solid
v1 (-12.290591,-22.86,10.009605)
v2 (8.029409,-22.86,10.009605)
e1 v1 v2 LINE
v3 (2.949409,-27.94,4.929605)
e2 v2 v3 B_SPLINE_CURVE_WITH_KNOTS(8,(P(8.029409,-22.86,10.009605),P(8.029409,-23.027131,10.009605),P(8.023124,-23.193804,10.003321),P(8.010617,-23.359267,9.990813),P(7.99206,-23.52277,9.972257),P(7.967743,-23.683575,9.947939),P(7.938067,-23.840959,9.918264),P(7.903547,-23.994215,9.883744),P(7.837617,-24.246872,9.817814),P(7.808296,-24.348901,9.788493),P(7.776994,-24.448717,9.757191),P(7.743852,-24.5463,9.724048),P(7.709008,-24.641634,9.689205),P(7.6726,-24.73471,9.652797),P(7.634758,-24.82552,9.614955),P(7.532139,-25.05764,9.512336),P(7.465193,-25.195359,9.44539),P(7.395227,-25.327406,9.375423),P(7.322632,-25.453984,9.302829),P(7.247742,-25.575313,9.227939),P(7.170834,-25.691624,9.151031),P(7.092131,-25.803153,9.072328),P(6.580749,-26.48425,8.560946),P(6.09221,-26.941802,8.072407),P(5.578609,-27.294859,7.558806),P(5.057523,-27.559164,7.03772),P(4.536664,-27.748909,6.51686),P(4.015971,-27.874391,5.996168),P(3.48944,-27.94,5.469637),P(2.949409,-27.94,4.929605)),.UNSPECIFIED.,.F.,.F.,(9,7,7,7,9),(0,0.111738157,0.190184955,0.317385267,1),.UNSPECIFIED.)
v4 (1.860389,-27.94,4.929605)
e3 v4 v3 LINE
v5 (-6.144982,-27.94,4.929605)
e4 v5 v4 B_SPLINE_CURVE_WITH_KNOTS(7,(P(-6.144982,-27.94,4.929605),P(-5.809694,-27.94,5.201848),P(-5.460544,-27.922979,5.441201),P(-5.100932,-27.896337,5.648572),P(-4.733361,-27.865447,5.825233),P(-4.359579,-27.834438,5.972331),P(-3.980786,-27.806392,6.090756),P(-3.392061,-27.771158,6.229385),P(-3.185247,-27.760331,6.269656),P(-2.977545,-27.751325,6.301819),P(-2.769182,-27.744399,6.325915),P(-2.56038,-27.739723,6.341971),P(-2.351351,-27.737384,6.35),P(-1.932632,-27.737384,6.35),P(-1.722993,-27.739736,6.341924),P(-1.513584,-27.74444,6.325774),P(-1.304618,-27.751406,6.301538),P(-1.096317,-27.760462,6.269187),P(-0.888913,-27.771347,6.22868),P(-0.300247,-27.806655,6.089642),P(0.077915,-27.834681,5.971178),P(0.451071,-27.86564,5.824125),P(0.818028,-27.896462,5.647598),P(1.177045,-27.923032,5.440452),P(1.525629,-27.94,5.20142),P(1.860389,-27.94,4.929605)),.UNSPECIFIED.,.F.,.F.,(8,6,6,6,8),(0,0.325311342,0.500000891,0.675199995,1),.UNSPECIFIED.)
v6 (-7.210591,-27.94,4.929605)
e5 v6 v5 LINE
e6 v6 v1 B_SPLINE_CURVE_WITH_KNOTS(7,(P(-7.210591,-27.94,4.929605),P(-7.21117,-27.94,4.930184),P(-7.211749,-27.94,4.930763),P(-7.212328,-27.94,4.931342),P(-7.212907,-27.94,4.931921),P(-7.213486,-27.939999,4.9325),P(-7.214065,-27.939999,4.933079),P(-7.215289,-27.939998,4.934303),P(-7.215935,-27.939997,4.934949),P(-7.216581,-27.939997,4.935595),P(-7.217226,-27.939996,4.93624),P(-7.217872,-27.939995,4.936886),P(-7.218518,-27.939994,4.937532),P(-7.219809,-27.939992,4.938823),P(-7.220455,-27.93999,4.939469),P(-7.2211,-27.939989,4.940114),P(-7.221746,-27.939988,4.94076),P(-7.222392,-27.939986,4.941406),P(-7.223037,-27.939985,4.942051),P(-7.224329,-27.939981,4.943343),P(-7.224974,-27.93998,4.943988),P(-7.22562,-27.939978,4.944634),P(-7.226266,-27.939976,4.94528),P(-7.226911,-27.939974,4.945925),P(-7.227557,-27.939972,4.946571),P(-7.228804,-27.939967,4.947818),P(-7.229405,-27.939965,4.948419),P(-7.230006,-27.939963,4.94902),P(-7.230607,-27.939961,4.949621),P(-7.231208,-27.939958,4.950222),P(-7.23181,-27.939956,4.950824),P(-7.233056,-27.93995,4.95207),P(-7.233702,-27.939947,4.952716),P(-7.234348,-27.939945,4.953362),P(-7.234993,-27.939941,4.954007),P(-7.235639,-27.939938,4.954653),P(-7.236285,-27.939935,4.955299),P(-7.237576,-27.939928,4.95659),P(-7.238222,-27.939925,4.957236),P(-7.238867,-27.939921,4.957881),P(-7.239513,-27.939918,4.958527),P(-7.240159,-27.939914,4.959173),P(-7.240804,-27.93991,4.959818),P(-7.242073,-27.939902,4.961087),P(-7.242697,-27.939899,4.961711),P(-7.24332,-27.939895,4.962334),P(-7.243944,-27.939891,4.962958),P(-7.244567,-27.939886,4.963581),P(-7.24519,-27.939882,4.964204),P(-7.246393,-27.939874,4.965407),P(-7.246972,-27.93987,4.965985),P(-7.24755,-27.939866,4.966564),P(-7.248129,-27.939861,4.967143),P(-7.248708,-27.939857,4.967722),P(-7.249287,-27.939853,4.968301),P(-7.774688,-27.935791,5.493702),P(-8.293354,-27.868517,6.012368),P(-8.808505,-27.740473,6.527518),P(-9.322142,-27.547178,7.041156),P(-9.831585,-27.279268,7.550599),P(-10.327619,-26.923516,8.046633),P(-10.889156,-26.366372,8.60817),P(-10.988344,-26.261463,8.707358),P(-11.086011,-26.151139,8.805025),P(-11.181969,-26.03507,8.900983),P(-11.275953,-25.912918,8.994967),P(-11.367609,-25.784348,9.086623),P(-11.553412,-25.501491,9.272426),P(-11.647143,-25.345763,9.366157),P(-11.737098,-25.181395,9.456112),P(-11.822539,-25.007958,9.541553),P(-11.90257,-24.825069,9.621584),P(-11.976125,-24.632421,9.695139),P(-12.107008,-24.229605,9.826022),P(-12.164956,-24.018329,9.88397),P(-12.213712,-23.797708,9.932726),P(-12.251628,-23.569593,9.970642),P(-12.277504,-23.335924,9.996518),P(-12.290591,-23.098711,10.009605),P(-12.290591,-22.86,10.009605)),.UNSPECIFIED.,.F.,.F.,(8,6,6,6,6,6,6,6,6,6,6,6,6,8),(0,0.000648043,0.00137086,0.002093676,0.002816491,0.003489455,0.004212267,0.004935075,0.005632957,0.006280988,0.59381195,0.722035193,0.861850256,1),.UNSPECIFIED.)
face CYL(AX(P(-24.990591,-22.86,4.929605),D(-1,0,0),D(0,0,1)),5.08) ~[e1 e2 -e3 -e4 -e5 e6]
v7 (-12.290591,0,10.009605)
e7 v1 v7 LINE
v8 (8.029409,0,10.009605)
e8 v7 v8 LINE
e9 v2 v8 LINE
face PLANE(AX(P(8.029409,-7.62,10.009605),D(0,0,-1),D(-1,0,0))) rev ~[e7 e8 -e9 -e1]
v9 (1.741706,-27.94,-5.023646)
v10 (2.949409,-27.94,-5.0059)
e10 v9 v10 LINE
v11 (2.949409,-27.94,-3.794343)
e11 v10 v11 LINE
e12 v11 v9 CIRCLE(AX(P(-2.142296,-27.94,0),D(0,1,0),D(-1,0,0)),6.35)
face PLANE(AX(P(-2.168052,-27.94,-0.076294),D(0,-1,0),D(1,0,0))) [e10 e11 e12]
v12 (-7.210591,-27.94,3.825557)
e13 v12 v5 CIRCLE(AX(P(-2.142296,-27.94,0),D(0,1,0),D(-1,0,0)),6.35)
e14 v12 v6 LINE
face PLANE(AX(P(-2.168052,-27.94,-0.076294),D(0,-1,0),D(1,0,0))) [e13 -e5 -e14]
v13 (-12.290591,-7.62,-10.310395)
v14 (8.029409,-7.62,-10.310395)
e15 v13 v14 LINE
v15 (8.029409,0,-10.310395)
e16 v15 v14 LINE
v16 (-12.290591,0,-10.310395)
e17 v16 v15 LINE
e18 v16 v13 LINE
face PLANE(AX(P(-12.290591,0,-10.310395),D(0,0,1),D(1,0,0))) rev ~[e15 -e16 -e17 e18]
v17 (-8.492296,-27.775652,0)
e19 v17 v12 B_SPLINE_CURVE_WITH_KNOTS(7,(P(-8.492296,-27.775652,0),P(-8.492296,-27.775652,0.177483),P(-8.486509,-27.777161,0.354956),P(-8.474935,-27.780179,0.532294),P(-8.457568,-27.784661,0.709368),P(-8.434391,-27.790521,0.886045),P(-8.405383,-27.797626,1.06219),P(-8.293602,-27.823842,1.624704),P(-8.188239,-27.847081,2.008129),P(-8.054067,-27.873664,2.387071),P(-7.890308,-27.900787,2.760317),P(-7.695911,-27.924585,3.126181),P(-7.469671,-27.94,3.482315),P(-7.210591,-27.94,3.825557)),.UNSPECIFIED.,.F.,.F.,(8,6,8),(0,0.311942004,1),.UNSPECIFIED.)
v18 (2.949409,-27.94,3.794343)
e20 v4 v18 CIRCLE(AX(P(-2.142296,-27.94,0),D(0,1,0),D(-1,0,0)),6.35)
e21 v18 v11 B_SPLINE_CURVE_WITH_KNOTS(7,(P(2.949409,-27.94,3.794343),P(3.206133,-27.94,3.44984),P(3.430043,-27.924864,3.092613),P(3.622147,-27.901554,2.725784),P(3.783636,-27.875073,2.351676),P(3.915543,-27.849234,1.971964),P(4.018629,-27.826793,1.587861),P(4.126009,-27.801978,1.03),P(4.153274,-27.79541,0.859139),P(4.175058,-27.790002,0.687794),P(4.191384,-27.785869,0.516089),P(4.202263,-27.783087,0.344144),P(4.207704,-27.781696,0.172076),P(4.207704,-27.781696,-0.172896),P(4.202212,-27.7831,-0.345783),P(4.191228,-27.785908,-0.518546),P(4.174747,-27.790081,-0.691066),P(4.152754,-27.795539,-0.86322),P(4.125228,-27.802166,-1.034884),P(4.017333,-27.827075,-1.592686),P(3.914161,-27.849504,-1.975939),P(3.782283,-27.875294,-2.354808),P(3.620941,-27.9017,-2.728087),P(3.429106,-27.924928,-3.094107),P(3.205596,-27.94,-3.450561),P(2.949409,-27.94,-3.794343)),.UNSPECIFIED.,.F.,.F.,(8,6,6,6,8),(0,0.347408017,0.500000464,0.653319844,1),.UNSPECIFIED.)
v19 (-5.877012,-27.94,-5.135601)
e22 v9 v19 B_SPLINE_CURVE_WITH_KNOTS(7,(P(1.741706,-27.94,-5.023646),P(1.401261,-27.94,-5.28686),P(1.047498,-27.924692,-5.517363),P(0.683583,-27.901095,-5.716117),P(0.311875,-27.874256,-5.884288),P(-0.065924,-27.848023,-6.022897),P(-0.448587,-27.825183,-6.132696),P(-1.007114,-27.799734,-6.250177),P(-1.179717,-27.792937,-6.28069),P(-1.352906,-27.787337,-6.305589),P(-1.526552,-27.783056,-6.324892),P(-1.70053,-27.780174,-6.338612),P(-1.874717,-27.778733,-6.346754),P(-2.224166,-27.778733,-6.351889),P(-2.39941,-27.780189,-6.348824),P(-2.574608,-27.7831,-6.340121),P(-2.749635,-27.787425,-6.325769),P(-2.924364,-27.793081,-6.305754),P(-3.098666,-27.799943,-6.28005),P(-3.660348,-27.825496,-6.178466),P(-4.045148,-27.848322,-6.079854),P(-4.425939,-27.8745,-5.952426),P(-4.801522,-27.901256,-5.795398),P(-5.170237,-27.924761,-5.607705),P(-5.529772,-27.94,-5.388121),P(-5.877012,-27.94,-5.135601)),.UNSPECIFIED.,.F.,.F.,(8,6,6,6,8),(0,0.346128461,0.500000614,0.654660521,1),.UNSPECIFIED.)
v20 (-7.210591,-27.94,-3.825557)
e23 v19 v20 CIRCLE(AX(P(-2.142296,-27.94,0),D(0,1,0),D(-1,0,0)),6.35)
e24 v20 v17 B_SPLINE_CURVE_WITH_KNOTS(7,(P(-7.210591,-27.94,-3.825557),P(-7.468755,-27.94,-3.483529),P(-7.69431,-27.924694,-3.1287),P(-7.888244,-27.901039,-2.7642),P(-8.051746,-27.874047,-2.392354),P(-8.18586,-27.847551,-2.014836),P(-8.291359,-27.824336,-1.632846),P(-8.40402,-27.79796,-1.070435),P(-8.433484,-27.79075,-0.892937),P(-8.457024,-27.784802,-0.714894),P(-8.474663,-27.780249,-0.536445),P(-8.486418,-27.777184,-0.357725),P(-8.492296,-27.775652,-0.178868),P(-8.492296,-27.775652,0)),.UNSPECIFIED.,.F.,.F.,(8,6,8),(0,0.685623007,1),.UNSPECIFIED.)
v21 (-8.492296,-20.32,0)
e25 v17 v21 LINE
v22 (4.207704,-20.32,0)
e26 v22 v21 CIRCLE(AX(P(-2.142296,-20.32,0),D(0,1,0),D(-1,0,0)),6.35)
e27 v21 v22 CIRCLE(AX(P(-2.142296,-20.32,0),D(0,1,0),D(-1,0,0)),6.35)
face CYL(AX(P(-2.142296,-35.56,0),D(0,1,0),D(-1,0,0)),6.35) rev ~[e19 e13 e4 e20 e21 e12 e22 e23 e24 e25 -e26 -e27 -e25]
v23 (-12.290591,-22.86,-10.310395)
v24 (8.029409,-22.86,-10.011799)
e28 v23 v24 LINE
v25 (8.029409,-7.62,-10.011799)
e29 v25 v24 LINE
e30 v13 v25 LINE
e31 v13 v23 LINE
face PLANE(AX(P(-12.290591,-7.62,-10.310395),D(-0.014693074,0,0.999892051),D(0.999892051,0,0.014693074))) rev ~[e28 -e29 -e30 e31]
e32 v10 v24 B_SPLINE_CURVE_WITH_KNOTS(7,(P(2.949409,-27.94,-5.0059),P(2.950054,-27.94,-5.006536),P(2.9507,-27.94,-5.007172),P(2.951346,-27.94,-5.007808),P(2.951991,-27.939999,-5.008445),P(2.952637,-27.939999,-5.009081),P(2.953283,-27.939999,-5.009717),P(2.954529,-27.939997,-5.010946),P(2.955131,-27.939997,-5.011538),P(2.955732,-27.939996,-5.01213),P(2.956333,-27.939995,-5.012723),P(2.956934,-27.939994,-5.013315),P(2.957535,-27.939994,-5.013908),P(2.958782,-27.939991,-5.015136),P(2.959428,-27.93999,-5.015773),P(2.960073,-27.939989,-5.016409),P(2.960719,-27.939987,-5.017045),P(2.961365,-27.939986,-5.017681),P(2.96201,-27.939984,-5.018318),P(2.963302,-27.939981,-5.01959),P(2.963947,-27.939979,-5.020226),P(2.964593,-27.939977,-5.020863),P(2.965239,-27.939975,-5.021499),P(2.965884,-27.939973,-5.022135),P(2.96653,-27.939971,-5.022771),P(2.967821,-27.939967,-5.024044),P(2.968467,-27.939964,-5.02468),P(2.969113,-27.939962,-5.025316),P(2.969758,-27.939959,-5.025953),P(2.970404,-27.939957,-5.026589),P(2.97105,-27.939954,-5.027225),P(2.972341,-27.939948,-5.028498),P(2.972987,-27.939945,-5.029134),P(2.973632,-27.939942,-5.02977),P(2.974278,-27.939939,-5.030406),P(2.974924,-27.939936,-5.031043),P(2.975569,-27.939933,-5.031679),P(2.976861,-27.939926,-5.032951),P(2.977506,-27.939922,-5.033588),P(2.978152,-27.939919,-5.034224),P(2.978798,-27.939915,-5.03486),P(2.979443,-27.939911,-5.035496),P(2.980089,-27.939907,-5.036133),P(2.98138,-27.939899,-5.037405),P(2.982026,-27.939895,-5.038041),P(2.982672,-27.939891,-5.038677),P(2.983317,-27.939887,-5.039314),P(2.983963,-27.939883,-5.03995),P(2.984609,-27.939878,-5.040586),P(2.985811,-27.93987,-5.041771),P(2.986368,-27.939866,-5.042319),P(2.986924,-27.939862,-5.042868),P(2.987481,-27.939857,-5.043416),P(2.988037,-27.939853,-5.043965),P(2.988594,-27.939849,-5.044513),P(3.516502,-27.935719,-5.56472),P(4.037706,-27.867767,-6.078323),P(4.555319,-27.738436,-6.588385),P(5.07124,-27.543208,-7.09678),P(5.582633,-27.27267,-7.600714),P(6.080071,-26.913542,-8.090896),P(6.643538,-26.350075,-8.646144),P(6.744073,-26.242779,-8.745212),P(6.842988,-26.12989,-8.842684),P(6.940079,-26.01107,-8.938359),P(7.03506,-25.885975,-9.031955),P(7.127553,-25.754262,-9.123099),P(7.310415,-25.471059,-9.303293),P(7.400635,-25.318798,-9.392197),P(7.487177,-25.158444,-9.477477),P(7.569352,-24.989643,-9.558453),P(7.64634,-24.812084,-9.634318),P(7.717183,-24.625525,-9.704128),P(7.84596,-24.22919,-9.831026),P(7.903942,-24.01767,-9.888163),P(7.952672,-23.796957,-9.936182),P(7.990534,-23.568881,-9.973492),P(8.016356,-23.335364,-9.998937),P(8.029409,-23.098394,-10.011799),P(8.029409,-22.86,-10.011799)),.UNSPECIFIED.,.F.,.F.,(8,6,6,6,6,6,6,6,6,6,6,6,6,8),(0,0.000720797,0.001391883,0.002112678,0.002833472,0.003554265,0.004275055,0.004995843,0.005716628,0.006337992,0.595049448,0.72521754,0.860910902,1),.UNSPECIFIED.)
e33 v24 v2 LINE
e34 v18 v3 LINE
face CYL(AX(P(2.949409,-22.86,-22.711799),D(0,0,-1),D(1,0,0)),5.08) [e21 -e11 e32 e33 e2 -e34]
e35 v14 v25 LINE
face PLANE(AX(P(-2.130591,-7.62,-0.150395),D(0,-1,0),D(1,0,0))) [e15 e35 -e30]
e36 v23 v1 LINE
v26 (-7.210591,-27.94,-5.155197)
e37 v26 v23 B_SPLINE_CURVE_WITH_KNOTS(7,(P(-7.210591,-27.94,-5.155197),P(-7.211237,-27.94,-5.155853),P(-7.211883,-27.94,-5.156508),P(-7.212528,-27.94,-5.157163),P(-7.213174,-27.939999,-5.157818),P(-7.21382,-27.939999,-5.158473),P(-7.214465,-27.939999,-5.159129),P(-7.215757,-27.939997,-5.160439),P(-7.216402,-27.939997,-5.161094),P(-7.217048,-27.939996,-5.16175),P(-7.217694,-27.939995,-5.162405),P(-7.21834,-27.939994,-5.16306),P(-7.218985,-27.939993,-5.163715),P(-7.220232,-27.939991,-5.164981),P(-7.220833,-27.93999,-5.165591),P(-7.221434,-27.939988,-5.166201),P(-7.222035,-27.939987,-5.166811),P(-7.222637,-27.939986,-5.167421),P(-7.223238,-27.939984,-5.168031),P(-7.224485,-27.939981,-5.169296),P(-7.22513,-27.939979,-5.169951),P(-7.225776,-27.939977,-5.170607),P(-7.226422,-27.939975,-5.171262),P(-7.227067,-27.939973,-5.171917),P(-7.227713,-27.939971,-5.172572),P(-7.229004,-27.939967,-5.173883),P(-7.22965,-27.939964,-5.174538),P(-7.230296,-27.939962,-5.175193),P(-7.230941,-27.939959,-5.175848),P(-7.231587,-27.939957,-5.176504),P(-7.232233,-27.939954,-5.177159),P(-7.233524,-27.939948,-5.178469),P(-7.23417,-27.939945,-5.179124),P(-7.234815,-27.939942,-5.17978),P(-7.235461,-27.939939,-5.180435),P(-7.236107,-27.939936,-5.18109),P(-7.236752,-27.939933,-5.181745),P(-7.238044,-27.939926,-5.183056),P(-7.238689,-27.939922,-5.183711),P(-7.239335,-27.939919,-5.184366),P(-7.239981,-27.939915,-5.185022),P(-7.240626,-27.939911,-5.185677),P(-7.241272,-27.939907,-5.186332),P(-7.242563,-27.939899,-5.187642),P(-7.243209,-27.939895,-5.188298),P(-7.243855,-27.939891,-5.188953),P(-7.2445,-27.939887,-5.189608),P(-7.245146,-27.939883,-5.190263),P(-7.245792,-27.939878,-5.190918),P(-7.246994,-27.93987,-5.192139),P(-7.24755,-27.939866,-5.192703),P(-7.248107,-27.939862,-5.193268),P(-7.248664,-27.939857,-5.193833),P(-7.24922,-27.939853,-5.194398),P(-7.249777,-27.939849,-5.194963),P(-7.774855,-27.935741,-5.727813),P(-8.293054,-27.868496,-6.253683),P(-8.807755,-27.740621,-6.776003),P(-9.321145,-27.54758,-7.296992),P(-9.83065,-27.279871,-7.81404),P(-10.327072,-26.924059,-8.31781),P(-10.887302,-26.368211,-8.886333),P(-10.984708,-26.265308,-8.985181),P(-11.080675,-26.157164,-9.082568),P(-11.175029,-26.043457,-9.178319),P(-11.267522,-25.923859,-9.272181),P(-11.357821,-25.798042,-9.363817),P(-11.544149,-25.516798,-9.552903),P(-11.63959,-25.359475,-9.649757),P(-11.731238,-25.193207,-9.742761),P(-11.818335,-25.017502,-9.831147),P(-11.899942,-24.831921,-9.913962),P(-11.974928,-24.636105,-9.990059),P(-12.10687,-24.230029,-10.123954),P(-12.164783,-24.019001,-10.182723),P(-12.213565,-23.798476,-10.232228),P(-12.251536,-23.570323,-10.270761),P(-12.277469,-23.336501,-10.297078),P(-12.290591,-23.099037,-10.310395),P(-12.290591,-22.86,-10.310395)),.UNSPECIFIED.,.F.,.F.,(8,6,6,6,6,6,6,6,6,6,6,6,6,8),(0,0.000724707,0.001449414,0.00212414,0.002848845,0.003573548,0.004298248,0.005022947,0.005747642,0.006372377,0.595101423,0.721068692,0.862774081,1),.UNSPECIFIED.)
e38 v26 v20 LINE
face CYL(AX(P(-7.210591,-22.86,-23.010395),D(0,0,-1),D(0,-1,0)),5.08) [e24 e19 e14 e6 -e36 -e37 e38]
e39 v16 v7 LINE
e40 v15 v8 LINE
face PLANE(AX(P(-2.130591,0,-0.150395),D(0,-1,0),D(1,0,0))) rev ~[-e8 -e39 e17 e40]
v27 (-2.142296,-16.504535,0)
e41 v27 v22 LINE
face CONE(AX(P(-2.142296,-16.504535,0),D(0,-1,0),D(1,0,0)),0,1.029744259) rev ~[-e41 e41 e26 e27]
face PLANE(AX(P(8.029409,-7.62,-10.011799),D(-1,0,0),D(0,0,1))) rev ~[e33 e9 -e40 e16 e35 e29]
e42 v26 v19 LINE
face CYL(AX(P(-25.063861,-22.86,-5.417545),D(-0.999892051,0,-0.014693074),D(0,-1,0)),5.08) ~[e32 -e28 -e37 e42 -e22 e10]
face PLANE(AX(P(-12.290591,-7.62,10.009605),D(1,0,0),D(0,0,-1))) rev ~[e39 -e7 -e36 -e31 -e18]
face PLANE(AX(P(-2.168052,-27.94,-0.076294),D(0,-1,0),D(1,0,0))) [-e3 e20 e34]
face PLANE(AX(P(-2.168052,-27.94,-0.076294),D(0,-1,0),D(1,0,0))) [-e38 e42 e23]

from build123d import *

# Parameters (mm, degrees)
F0_W        = 20.32
F0_H        = 20.32
F1_DEPTH    = 7.62
F3_DEPTH    = 20.32
F5_D        = 12.7
F5_DEPTH    = 7.62
F5_TIP      = 3.8154649308
F6_T1_DEPTH = 45.72
F6_T3_DEPTH = 45.4214045093
F6_T5_DEPTH = 45.72
F6_T7_DEPTH = 45.7221937612


# Not quite as in the source:
# - a fillet or chamfer that OpenCascade refuses, or shapes differently, is made with other operations: its cross-section is extruded or revolved along the edge and cut away or added


with BuildPart() as f1:
    # F0 (on Front) → F1 (new body)
    with BuildSketch(Plane.XZ):
        with Locations((-2.1305914207, -0.150394626)):
            Rectangle(F0_W, F0_H)
    extrude(amount=F1_DEPTH)

    # F2 (on face) → F3 (join)
    with BuildSketch(Plane.XZ.offset(7.62)):
        Polygon((-12.2905914207, 10.009605374), (-12.2905914207, -10.310394626), (8.0294085793, -10.0117991352), (8.0294085793, 10.009605374), align=None)
    extrude(amount=F3_DEPTH)

    # F5
    with Locations(Plane.XZ.offset(27.94)):
        with Locations((-2.1422964055, 0)):
            Hole(F5_D / 2, depth=F5_DEPTH)
            with Locations((0, 0, -(F5_DEPTH + F5_TIP / 2))):  # 118° drill point
                Cone(0, F5_D / 2, F5_TIP, mode=Mode.SUBTRACT)

    # F6: fillet of radius 5.08 on 4 edges, made by hand

    # F6_s2 → F6_t1 (cut)
    with BuildSketch(Plane.YZ.offset(-24.9905914207)):
        with BuildLine():
            ThreePointArc((-22.86, 10.009605374), (-26.4521024484, 8.5217078225), (-27.94, 4.929605374))
            Line((-27.94, 4.929605374), (-27.94, 10.009605374))
            Line((-27.94, 10.009605374), (-22.86, 10.009605374))
        make_face()
    extrude(amount=F6_T1_DEPTH, mode=Mode.SUBTRACT)

    # F6_s4 → F6_t3 (cut)
    with BuildSketch(Plane.XY.offset(-22.7117991352)):
        with BuildLine():
            ThreePointArc((8.0294085793, -22.86), (6.5415110277, -26.4521024484), (2.9494085793, -27.94))
            Line((2.9494085793, -27.94), (8.0294085793, -27.94))
            Line((8.0294085793, -27.94), (8.0294085793, -22.86))
        make_face()
    extrude(amount=F6_T3_DEPTH, mode=Mode.SUBTRACT)

    # F6_s6 → F6_t5 (cut)
    with BuildSketch(Plane.XY.offset(-23.010394626)):
        with BuildLine():
            ThreePointArc((-7.2105914207, -27.94), (-10.8026938691, -26.4521024484), (-12.2905914207, -22.86))
            Line((-12.2905914207, -22.86), (-12.2905914207, -27.94))
            Line((-12.2905914207, -27.94), (-7.2105914207, -27.94))
        make_face()
    extrude(amount=F6_T5_DEPTH, mode=Mode.SUBTRACT)

    # F6_s8 → F6_t7 (cut)
    with BuildSketch(Plane(origin=(-25.138042131, 0, -0.3693949816), x_dir=(0, 1, 0), z_dir=(0.999892051, 0, 0.0146930737))):
        with BuildLine():
            ThreePointArc((-27.94, -5.0486950632), (-26.4521024484, -8.6407975117), (-22.86, -10.1286950632))
            Line((-22.86, -10.1286950632), (-27.94, -10.1286950632))
            Line((-27.94, -10.1286950632), (-27.94, -5.0486950632))
        make_face()
    extrude(amount=F6_T7_DEPTH, mode=Mode.SUBTRACT)


solid = f1.part
